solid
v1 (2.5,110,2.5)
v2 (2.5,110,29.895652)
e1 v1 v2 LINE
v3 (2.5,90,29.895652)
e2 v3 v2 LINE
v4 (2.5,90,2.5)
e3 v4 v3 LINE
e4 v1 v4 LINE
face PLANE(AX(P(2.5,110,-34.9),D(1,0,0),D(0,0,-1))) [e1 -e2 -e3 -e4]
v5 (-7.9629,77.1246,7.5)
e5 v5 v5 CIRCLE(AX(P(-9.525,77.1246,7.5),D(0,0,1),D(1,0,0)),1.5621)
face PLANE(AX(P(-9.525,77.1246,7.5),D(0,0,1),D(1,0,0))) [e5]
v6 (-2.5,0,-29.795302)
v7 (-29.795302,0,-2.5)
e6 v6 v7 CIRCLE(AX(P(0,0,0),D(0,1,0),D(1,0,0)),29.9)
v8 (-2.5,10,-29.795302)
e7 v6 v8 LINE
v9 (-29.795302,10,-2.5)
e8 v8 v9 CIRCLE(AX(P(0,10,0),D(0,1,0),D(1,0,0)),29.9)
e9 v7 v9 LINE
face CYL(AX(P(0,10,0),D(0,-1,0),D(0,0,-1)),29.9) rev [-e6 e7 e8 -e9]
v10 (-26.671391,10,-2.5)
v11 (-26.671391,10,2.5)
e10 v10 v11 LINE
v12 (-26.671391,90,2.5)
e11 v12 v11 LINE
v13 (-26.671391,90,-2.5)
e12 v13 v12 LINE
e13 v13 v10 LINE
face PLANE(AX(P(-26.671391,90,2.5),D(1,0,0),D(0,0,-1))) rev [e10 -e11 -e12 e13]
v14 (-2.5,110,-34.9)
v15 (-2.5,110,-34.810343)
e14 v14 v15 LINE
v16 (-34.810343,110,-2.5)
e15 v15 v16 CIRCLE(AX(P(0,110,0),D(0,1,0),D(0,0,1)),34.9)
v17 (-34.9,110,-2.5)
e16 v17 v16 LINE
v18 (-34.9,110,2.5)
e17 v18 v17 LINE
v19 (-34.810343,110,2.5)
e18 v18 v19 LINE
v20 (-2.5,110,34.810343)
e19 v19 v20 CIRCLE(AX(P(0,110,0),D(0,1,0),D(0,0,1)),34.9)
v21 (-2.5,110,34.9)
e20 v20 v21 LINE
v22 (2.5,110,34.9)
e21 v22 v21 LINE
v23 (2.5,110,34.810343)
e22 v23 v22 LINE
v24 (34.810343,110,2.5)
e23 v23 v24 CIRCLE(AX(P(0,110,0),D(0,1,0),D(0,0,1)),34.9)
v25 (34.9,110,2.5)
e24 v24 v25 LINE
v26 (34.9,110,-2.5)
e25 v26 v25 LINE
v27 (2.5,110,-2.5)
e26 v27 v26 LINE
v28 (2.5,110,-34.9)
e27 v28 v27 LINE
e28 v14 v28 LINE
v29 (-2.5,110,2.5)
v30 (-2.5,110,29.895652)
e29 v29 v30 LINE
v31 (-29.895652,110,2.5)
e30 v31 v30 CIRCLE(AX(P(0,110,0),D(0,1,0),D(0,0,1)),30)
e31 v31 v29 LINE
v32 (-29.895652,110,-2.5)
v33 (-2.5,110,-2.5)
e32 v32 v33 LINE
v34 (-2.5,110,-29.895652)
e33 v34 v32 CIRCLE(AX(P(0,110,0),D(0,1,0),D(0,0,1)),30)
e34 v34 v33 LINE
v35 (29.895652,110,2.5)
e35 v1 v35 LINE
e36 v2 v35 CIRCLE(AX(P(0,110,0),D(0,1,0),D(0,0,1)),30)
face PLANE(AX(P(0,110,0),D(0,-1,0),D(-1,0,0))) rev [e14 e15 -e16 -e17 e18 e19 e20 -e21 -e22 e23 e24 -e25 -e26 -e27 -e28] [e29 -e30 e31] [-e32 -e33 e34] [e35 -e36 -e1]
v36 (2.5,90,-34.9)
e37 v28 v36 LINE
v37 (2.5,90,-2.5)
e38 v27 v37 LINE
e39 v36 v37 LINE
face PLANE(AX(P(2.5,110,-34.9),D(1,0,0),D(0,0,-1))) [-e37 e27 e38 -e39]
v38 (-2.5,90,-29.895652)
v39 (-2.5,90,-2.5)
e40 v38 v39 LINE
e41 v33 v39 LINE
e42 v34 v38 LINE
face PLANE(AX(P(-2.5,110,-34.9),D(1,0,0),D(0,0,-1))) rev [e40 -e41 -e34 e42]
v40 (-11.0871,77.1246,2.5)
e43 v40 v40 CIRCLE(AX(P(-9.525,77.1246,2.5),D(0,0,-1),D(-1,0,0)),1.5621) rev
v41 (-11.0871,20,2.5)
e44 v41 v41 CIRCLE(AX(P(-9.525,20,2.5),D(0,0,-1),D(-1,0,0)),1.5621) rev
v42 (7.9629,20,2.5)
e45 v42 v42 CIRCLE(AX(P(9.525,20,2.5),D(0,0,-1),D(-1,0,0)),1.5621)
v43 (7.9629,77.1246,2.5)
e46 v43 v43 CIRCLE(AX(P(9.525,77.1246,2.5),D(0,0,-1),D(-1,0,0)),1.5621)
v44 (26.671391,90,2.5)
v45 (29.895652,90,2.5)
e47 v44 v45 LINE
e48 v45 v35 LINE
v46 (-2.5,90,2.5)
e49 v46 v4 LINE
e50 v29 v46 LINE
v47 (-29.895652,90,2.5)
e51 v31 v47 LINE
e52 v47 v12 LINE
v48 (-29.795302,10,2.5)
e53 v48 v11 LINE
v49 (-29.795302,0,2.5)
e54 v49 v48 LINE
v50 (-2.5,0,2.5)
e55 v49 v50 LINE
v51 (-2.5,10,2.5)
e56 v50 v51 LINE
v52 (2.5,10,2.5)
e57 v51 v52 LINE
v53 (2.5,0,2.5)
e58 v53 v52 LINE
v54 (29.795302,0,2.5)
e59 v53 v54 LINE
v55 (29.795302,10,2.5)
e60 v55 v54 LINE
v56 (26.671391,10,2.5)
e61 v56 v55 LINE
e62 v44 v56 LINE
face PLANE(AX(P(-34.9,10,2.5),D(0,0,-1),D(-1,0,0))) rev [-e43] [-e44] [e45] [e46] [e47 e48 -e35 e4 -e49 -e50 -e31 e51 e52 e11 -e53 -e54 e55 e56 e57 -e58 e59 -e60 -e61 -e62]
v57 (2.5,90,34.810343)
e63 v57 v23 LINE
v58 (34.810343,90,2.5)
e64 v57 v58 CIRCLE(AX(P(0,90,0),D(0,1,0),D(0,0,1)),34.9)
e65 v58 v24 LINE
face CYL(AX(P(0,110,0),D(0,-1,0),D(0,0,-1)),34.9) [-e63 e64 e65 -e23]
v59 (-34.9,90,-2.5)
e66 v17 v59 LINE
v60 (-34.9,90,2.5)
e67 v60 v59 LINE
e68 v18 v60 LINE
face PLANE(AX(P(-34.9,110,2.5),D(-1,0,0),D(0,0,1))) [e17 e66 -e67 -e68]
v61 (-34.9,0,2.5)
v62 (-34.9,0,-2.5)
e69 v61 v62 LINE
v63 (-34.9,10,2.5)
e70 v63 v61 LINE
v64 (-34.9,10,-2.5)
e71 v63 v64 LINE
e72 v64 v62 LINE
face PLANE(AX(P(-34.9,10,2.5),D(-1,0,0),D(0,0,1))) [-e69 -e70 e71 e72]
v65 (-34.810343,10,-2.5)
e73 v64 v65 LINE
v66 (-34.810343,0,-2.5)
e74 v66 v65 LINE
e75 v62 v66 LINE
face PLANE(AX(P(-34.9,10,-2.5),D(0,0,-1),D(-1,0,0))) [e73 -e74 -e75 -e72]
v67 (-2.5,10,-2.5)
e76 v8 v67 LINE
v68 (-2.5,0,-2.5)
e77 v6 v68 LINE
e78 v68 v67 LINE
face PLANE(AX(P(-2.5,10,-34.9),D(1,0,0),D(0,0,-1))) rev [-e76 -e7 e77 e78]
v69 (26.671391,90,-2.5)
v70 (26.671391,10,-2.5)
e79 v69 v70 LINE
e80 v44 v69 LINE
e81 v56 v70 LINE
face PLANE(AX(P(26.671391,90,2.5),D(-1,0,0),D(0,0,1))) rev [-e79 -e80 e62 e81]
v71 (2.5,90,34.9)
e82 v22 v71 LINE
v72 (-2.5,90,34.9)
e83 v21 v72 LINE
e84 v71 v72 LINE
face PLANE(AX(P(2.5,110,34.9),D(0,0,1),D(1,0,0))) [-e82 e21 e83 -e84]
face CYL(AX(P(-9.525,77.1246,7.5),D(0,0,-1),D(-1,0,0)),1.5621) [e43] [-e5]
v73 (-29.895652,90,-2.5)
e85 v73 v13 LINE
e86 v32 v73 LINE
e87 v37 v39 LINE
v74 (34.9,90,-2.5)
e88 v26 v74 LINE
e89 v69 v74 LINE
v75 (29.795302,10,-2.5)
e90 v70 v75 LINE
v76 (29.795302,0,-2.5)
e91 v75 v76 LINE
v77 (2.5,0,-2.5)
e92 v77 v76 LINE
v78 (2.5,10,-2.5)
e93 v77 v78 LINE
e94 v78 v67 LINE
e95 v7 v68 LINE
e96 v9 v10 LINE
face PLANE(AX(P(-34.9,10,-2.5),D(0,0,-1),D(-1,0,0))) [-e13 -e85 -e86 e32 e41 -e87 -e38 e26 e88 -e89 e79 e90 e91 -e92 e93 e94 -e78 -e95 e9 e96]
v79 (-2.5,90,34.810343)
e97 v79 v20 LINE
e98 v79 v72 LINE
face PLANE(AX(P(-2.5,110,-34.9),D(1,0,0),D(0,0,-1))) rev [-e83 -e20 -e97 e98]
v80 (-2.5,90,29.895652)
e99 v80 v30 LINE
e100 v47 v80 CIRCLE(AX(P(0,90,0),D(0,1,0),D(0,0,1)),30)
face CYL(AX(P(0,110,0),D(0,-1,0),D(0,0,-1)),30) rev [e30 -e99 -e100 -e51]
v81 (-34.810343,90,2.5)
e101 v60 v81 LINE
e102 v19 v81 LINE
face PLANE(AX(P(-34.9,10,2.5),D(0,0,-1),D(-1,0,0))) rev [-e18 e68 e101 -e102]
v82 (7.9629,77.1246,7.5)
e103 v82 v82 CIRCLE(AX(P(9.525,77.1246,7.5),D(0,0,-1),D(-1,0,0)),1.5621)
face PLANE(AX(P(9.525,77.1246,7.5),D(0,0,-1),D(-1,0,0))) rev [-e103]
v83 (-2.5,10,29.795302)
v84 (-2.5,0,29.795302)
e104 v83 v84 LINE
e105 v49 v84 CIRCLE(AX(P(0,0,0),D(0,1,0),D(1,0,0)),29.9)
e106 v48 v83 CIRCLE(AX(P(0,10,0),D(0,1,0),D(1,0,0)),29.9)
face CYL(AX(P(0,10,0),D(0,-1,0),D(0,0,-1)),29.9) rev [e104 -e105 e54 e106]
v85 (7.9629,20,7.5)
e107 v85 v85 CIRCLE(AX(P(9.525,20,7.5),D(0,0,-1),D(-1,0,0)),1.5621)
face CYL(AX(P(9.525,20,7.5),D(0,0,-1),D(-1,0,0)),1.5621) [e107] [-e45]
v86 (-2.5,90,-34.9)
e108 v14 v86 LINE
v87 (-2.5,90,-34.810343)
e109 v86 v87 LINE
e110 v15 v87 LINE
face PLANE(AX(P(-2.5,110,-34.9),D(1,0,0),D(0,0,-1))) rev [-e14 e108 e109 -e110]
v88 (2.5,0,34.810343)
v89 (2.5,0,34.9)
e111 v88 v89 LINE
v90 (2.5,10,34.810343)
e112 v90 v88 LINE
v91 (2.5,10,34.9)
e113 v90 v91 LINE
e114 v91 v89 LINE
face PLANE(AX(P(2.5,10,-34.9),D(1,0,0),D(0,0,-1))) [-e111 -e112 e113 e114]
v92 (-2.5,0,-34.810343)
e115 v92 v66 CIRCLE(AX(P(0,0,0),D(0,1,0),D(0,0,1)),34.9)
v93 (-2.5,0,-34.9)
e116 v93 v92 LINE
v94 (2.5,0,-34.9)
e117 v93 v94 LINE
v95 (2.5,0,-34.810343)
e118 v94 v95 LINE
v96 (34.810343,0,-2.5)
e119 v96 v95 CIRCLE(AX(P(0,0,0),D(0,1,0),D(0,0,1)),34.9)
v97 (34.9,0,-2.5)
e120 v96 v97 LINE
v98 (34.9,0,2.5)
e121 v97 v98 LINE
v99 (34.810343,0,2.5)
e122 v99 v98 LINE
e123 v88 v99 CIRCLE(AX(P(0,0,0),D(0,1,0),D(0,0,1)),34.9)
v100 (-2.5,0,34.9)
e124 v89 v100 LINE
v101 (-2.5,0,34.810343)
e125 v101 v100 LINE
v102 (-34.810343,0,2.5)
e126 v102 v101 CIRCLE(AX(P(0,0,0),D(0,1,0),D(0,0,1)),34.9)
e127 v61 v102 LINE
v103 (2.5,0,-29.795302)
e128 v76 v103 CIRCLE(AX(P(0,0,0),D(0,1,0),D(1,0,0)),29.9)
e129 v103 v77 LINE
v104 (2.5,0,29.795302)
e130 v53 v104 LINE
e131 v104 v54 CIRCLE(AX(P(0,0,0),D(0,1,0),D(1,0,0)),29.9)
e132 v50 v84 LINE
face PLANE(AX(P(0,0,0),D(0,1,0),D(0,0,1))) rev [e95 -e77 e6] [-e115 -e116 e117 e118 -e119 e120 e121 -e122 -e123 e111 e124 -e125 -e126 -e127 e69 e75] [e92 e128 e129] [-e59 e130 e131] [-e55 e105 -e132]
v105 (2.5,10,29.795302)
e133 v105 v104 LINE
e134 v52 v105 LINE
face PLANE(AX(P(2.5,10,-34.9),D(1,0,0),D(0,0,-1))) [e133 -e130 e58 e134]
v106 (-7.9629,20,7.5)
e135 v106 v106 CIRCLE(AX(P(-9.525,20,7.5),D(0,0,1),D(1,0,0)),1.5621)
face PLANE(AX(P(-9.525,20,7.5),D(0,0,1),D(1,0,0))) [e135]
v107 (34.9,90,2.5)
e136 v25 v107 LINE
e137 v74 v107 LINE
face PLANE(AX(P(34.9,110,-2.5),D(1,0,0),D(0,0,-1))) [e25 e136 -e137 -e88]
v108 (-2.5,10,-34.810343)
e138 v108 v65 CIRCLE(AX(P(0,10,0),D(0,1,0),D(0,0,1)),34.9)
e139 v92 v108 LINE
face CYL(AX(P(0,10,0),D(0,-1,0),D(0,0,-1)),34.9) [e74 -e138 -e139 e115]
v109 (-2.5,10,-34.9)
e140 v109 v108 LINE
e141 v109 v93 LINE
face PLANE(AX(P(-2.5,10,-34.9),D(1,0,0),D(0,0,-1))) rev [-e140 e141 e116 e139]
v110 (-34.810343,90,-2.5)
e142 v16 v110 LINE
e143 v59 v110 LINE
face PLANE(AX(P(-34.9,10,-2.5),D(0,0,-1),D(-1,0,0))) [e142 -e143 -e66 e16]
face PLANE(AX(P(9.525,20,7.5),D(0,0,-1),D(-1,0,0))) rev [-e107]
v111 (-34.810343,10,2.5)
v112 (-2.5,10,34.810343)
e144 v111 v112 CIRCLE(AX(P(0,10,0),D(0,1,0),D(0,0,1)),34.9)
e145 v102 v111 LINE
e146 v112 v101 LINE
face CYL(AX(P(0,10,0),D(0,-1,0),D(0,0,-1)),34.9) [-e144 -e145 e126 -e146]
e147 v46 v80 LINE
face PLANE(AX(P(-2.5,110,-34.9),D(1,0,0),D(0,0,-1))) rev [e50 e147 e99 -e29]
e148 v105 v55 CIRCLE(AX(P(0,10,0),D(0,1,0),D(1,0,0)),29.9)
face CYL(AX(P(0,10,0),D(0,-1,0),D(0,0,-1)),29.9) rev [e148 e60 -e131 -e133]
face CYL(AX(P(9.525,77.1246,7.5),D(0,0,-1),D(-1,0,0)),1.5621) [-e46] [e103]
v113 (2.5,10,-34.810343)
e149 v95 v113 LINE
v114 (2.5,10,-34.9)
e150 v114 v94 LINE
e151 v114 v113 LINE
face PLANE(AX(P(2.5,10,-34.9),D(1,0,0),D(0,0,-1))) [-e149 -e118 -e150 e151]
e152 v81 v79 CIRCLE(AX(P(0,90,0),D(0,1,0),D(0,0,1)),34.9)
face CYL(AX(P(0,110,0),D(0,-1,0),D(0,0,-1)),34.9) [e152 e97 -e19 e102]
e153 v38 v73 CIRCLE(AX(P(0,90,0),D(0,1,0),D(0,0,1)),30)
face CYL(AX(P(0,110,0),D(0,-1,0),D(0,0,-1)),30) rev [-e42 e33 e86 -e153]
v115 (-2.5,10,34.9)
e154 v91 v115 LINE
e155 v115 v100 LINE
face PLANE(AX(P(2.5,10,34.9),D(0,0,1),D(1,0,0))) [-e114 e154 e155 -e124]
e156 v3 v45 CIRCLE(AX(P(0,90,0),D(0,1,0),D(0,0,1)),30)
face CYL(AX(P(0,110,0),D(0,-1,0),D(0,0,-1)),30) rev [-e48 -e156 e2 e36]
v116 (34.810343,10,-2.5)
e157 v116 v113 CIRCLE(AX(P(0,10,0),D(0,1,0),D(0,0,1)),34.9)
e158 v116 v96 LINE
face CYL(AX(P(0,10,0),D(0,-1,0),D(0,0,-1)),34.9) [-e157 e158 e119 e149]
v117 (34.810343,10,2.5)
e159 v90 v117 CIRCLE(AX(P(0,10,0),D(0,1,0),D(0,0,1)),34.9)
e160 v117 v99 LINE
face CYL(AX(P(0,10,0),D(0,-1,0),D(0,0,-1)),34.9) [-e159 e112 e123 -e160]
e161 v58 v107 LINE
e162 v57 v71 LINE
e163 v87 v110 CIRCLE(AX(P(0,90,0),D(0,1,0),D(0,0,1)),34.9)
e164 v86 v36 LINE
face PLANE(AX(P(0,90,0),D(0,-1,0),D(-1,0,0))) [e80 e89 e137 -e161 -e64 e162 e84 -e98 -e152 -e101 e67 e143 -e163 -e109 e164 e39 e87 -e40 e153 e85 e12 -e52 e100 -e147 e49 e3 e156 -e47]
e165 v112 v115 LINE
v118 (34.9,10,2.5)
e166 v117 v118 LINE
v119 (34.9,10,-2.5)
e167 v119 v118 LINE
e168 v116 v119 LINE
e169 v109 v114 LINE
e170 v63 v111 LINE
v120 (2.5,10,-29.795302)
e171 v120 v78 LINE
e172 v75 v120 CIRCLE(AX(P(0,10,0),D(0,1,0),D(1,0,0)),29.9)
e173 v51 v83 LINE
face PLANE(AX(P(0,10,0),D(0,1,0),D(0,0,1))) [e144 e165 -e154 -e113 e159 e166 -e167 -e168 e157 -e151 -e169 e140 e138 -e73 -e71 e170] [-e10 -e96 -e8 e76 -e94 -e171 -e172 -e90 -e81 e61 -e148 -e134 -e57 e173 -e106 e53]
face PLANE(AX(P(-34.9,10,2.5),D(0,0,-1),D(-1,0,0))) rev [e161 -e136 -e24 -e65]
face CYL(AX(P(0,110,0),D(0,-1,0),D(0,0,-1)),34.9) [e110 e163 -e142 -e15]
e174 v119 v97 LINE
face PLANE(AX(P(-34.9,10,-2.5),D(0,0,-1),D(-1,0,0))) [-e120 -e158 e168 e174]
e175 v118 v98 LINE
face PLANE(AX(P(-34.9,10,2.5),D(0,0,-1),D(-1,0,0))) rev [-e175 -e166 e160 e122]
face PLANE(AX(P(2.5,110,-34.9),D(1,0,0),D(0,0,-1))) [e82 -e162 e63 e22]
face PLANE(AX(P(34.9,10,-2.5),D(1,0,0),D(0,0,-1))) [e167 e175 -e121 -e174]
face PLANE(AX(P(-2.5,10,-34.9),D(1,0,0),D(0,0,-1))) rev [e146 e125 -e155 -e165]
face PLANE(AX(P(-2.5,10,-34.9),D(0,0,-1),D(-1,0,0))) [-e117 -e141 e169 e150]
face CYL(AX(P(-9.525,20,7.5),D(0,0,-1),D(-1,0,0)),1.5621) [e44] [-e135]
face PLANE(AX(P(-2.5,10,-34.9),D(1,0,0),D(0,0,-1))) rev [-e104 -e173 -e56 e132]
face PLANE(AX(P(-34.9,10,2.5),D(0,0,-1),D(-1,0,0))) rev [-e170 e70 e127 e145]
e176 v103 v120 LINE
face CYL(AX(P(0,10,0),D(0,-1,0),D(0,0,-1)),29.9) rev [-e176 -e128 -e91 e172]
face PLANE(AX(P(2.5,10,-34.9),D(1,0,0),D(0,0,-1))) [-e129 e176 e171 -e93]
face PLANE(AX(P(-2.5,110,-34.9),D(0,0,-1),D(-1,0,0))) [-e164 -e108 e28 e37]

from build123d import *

# Parameters (mm, degrees)
SKETCH1_R           = 34.9
SKETCH1_R_2         = 29.9
EXTRUDE_THIN1_DEPTH = 10
SKETCH1_3_W         = 5
SKETCH1_3_H         = 69.8
SKETCH1_3_W_2       = 69.8
SKETCH1_3_H_2       = 5
EXTRUDE_THIN2_DEPTH = 10
SKETCH2_W           = 53.342781532
SKETCH2_H           = 5
BOSS_EXTRUDE1_DEPTH = 80
SKETCH3_R           = 1.5621
BOSS_EXTRUDE2_DEPTH = 5
BOSS_EXTRUDE4_DEPTH = 20
SKETCH6_6_W         = 5
SKETCH6_6_H         = 69.8
SKETCH6_6_W_2       = 69.8
SKETCH6_6_H_2       = 5
EXTRUDE_THIN4_DEPTH = 20


with BuildPart() as part:
    # Sketch1 → Extrude-Thin1 (new body)
    with BuildSketch(Plane(origin=(0, 0, 0), x_dir=(1, 0, 0), z_dir=(0, 1, 0))):
        Circle(SKETCH1_R)
        Circle(SKETCH1_R_2, mode=Mode.SUBTRACT)
    extrude(amount=EXTRUDE_THIN1_DEPTH)

    # Sketch1<3> → Extrude-Thin2 (add)
    with BuildSketch(Plane(origin=(0, 0, 0), x_dir=(1, 0, 0), z_dir=(0, 1, 0))):
        Rectangle(SKETCH1_3_W, SKETCH1_3_H)
        Rectangle(SKETCH1_3_W_2, SKETCH1_3_H_2)
    extrude(amount=EXTRUDE_THIN2_DEPTH)

    # Sketch2 → Boss-Extrude1 (add)
    with BuildSketch(Plane(origin=(0, 10, 0), x_dir=(1, 0, 0), z_dir=(0, 1, 0))):
        Rectangle(SKETCH2_W, SKETCH2_H)
    extrude(amount=BOSS_EXTRUDE1_DEPTH)

    # Sketch3 → Boss-Extrude2 (add)
    with BuildSketch(Plane.XY.offset(2.5)):
        with Locations((-9.525, 77.1246)):
            Circle(SKETCH3_R)
        with Locations((-9.525, 20)):
            Circle(SKETCH3_R)
        with Locations((9.525, 20)):
            Circle(SKETCH3_R)
        with Locations((9.525, 77.1246)):
            Circle(SKETCH3_R)
    extrude(amount=BOSS_EXTRUDE2_DEPTH)



with BuildPart() as body_2:
    # Sketch6 → Boss-Extrude4 (new body)
    with BuildSketch(Plane(origin=(0, 90, 0), x_dir=(1, 0, 0), z_dir=(0, 1, 0))):
        with BuildLine():
            Line((0, 30), (0, 34.9))
            ThreePointArc((0, 34.9), (-24.678026663, -24.678026663), (34.9, 0))
            Line((34.9, 0), (30, 0))
            ThreePointArc((30, 0), (-21.213203436, -21.213203436), (0, 30))
        make_face()
    extrude(amount=BOSS_EXTRUDE4_DEPTH)


with BuildPart() as part_1:
    add(part.part)

    add(body_2.part)  # Extrude-Thin4 merges body 2
    # Sketch6<6> → Extrude-Thin4 (add)
    with BuildSketch(Plane(origin=(0, 90, 0), x_dir=(1, 0, 0), z_dir=(0, 1, 0))):
        Rectangle(SKETCH6_6_W, SKETCH6_6_H)
        Rectangle(SKETCH6_6_W_2, SKETCH6_6_H_2)
    extrude(amount=EXTRUDE_THIN4_DEPTH)


solid = part_1.part
